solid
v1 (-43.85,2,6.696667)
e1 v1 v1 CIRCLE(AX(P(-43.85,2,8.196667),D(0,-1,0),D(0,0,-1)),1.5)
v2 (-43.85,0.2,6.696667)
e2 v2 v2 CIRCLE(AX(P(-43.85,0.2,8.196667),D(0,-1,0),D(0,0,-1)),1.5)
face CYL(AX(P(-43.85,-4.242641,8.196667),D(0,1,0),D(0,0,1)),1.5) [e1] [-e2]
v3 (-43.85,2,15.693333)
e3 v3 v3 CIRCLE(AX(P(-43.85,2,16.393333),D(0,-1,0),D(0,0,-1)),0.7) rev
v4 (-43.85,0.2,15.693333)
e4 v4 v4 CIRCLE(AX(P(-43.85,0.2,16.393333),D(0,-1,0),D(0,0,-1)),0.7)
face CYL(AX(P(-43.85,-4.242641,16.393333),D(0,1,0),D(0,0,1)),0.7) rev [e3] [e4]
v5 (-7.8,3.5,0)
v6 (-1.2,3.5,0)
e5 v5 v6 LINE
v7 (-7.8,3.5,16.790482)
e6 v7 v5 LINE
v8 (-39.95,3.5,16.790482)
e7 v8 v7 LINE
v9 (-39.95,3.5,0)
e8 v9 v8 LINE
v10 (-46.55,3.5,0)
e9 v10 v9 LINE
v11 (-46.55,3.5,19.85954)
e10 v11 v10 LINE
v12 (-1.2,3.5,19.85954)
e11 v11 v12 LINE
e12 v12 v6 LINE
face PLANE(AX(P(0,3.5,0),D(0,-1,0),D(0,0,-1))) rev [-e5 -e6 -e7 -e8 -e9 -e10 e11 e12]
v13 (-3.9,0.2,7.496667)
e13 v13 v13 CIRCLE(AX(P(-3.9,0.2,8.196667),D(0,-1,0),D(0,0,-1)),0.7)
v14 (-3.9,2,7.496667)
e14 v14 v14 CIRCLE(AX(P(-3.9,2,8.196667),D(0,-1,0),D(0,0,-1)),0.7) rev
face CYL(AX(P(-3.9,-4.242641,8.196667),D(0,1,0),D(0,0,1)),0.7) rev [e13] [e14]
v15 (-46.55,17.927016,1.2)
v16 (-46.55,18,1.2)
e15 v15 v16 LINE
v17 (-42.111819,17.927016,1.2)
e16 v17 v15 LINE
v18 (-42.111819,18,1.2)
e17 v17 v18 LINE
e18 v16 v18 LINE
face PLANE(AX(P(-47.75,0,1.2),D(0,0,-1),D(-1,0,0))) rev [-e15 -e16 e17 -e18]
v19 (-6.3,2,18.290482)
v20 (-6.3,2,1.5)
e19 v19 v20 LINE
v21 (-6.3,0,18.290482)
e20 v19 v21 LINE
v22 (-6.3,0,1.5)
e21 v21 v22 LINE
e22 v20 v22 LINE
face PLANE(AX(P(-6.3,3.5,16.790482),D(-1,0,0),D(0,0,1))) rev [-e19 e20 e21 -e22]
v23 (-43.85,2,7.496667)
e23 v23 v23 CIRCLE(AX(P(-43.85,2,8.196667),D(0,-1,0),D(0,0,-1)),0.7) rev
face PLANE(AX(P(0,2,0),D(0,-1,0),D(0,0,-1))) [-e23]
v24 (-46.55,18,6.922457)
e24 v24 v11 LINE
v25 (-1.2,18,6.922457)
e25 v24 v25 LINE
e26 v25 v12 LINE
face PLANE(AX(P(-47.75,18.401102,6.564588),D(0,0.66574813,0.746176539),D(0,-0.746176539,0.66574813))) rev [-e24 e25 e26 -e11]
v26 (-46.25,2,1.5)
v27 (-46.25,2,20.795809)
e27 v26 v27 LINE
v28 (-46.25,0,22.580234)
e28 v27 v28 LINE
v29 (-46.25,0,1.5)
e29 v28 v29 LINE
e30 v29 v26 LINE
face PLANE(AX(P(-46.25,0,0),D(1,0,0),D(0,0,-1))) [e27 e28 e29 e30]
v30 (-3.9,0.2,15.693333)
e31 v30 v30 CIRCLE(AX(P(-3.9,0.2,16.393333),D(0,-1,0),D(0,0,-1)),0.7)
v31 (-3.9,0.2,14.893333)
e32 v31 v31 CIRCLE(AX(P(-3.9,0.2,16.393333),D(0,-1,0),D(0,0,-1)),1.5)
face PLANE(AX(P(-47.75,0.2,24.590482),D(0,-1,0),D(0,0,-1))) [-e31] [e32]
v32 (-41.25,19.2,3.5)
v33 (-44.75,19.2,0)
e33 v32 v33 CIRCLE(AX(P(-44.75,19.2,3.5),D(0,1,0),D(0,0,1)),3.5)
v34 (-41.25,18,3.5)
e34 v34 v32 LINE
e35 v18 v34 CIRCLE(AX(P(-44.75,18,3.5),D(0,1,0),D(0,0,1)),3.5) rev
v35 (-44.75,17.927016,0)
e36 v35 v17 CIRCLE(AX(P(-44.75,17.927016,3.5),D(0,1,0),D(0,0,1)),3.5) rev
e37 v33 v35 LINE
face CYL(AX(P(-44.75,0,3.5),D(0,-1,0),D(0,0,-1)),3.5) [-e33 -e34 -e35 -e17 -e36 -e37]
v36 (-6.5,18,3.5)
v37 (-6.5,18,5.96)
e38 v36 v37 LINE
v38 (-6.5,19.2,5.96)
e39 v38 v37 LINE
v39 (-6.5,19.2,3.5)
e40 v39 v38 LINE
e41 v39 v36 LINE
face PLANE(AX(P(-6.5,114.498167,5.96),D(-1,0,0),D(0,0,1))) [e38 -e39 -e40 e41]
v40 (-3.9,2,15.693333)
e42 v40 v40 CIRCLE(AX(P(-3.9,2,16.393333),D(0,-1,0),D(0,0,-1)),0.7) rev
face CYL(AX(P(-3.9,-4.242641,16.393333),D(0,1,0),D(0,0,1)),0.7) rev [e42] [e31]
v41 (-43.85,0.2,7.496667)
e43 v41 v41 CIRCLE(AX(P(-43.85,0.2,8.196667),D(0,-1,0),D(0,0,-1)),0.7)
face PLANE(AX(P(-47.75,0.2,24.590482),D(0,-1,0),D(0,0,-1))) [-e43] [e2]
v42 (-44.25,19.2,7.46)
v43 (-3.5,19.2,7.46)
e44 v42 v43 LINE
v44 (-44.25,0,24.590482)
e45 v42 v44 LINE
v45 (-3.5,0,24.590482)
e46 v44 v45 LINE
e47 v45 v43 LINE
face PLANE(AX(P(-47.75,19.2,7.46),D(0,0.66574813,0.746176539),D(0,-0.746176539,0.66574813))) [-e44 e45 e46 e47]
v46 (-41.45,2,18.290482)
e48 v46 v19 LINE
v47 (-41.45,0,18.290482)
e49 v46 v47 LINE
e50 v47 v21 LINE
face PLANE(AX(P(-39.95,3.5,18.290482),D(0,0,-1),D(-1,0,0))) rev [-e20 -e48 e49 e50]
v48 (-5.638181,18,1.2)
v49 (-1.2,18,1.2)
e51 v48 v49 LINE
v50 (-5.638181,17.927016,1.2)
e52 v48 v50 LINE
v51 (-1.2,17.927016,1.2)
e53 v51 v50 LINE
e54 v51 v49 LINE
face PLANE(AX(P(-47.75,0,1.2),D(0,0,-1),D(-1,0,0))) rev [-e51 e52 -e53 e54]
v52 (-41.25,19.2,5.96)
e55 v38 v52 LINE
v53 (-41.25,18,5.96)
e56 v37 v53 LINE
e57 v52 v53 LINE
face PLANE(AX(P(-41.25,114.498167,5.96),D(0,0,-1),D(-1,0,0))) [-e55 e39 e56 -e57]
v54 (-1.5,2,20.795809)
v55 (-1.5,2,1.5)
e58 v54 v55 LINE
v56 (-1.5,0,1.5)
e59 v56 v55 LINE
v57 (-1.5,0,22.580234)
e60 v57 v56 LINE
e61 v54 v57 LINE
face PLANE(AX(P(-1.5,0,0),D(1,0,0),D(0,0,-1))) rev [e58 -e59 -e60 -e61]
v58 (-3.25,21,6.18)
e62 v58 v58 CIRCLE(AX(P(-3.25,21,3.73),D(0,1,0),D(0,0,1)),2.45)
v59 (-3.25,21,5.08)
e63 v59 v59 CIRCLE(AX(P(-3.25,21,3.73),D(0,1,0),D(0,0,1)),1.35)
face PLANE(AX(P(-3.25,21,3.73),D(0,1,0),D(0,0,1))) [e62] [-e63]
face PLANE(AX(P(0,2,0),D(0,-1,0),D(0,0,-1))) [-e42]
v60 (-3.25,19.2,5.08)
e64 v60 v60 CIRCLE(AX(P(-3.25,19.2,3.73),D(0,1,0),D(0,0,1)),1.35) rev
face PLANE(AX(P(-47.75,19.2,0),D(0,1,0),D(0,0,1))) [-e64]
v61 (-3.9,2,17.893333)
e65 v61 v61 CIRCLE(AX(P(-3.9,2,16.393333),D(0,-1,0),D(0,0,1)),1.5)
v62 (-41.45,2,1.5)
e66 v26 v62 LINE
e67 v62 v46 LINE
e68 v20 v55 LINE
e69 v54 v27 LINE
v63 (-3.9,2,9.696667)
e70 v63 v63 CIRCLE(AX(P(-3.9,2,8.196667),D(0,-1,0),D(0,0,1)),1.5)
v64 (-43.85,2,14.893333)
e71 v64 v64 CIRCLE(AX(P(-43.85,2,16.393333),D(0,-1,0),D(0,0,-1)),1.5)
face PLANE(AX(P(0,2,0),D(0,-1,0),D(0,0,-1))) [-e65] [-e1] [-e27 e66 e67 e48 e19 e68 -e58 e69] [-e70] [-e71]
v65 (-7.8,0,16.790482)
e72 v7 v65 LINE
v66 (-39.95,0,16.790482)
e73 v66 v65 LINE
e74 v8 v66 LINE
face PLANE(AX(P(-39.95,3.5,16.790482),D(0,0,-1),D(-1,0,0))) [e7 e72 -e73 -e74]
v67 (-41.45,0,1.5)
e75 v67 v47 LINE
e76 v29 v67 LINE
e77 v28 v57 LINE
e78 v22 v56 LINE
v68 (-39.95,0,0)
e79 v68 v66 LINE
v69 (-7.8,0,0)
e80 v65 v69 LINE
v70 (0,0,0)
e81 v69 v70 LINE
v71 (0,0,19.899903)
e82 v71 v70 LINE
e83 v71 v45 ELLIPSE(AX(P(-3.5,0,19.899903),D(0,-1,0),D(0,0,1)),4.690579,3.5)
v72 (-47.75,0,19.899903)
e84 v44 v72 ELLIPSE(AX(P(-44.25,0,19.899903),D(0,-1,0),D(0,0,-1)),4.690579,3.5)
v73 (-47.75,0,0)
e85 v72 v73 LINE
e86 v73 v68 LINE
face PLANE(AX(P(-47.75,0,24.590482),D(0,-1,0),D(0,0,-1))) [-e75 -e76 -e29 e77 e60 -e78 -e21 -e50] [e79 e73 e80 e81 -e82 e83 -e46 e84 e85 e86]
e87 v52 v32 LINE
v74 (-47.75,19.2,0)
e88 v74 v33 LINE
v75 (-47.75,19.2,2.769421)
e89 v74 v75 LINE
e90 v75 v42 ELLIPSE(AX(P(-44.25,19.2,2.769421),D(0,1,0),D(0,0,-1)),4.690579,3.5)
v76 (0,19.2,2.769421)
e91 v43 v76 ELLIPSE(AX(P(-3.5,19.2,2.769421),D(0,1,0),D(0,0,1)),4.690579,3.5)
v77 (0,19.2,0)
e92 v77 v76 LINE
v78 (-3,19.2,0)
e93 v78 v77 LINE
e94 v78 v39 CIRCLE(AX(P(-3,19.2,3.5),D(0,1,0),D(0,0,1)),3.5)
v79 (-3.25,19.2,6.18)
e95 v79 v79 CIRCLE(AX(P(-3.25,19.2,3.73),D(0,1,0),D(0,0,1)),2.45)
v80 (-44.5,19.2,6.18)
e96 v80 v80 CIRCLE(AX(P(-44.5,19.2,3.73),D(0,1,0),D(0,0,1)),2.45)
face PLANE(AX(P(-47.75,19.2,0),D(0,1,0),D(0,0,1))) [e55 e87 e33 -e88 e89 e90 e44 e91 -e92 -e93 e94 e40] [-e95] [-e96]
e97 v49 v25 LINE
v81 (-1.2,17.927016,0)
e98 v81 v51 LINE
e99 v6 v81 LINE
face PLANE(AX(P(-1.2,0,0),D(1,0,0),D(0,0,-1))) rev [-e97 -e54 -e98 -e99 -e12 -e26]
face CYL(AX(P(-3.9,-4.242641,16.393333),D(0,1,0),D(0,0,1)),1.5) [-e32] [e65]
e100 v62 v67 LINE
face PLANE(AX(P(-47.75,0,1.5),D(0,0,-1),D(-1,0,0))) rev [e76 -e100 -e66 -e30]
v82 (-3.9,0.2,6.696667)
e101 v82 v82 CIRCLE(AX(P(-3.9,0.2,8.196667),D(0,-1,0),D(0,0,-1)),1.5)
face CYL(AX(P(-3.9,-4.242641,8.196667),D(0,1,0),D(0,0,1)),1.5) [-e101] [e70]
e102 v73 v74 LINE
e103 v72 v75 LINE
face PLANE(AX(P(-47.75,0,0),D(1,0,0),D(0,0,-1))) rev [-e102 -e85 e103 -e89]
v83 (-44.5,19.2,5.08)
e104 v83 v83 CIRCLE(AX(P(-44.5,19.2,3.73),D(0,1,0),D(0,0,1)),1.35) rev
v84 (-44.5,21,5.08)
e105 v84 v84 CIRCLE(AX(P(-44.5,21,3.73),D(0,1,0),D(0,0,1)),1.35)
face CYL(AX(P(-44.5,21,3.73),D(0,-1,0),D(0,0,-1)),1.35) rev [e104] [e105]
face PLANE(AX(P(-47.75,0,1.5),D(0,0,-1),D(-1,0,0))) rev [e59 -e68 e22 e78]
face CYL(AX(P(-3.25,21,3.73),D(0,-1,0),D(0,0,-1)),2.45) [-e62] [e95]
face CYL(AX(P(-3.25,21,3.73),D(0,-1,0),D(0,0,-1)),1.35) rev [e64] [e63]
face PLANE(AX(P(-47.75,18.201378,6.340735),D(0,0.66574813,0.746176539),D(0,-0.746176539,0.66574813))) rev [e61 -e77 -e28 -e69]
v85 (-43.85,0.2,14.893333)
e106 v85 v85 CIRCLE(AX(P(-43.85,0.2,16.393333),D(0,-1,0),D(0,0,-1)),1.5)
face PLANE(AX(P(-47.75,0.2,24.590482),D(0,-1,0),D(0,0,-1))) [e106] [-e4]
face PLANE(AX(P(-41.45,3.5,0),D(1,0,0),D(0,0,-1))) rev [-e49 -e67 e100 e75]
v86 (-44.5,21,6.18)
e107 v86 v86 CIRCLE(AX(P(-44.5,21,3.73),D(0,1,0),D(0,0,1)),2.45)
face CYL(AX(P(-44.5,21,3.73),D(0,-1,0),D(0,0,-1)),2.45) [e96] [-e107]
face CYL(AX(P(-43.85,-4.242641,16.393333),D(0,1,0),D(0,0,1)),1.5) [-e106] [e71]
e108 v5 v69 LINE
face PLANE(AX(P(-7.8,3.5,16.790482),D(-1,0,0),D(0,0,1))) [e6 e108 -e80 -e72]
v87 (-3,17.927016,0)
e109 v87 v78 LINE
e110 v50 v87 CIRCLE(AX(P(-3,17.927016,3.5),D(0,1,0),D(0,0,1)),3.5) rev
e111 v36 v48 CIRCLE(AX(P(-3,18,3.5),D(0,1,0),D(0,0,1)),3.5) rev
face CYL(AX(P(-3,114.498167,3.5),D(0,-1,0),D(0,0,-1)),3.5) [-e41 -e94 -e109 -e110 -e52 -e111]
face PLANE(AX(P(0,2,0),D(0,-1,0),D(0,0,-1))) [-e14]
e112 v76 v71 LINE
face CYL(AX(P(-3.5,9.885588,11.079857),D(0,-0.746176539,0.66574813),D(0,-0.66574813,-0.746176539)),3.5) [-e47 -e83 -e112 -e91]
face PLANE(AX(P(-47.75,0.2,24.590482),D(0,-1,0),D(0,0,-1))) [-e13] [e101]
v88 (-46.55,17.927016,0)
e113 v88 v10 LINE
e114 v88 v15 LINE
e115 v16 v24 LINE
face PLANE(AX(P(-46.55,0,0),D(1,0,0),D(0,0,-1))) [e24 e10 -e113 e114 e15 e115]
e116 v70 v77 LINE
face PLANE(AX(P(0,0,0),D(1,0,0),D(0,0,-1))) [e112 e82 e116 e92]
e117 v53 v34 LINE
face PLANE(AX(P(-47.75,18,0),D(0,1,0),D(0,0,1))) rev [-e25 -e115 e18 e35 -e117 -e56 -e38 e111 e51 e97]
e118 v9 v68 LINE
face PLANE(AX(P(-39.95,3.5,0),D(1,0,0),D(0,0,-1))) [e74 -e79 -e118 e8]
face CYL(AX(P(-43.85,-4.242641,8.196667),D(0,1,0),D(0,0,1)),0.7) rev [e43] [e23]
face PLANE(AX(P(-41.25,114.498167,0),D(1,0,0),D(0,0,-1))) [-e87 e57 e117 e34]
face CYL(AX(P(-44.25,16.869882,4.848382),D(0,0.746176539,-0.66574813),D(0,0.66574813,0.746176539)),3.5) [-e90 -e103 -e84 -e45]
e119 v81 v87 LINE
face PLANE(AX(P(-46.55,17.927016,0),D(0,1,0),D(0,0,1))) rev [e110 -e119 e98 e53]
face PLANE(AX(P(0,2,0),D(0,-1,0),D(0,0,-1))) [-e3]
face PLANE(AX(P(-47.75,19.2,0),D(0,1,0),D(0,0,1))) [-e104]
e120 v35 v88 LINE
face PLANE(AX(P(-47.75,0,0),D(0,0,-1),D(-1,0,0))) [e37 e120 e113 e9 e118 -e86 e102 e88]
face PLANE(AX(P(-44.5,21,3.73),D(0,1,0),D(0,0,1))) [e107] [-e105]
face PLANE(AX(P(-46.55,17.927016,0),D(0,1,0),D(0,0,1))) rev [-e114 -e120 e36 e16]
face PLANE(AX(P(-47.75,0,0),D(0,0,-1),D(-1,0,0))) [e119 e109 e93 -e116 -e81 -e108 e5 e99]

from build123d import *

# Parameters (mm, degrees)
BOSS_EXTRUDE1_DEPTH     = 47.75
SHELL2_T                = -1.2
SKETCH2_W               = 45.35
SKETCH2_H               = 17.927015757
CUT_EXTRUDE1_DEPTH      = 57.531559043
CUT_EXTRUDE2_DEPTH      = 58.038533691
CUT_EXTRUDE2_DEPTH_BACK = 58.038533691
BOSS_EXTRUDE2_DEPTH     = 3.5
CUT_EXTRUDE3_DEPTH      = 58.038533691
SKETCH7_R               = 2.45
SKETCH7_R_2             = 1.35
BOSS_EXTRUDE3_DEPTH     = 1.8
SHELL3_START            = -46.25
SHELL3_DEPTH            = 44.75
SHELL3_2_OUTLINE_W      = 2
SHELL3_2_OUTLINE_H      = 16.790482419
SHELL3_2_DEPTH          = 4.8
SHELL3_START_2          = -6.3
SHELL3_3_OUTLINE_W      = 2
SHELL3_3_OUTLINE_H      = 16.790482419
SHELL3_3_DEPTH          = 4.8
SKETCH8_R               = 1.5
SKETCH8_R_2             = 0.7
BOSS_EXTRUDE4_DEPTH     = 1.8
FILLET1_R               = 3.5


# Read off the part's stored shape, not the designer's step: Shell3
with BuildPart() as part:
    # Sketch1 → Boss-Extrude1 (new body)
    with BuildSketch(Plane(origin=(0, 0, 0), x_dir=(0, 0, -1), z_dir=(1, 0, 0))):
        Polygon((0, 0), (0, 19.2), (-7.46, 19.2), (-24.590482419, 0), align=None)
    extrude(amount=-BOSS_EXTRUDE1_DEPTH)

    # Shell2
    shell2_openings = [part.faces().sort_by_distance(p)[0] for p in [
        (-23.875, 0, 12.29524121),
    ]]
    offset(amount=SHELL2_T, openings=shell2_openings, kind=Kind.INTERSECTION)

    # Sketch2 → Cut-Extrude1 (cut, through all)
    with BuildSketch(Plane.XY.offset(1.2)):
        with Locations((-23.875, 8.963507878)):
            Rectangle(SKETCH2_W, SKETCH2_H)
    extrude(amount=-CUT_EXTRUDE1_DEPTH, mode=Mode.SUBTRACT)

    # Sketch3 → Cut-Extrude2 (cut, two sides: drawn at the far end of the back side and taken through both)
    with BuildSketch(Plane(origin=(0, 19.2, 0), x_dir=(1, 0, 0), z_dir=(0, 1, 0)).offset(-CUT_EXTRUDE2_DEPTH_BACK)):
        Polygon((-41.25, 106.046953634), (-41.25, 0), (-41.25, -5.96), (-6.5, -5.96), (-6.5, 0), (-6.5, 106.046953634), (-6.5, 318.140860903), (-41.25, 318.140860903), align=None)
    extrude(amount=CUT_EXTRUDE2_DEPTH + CUT_EXTRUDE2_DEPTH_BACK, mode=Mode.SUBTRACT)

    # Sketch5 → Boss-Extrude2 (add)
    with BuildSketch(Plane.XZ):
        Polygon((-47.75, 0), (-39.95, 0), (-39.95, 16.790482419), (-7.8, 16.790482419), (-7.8, 0), (0, 0), (0, 24.590482419), (-47.75, 24.590482419), align=None)
    extrude(amount=-BOSS_EXTRUDE2_DEPTH)

    # Sketch6 → Cut-Extrude3 (cut, through all)
    with BuildSketch(Plane.ZY.offset(47.75)):
        Polygon((21.467738228, 3.5), (24.590482419, 0), (24.590482419, 3.5), align=None)
    extrude(amount=-CUT_EXTRUDE3_DEPTH, mode=Mode.SUBTRACT)

    # Sketch7 → Boss-Extrude3 (add)
    # profile 1 of 2: a face of its own
    with BuildSketch(Plane(origin=(0, 19.2, 0), x_dir=(1, 0, 0), z_dir=(0, 1, 0))):
        with Locations(Location((-44.5, -3.73, 0), (0, 0, 270))):
            Circle(SKETCH7_R)
        with Locations(Location((-44.5, -3.73, 0), (0, 0, 270))):
            Circle(SKETCH7_R_2, mode=Mode.SUBTRACT)
    # profile 2 of 2: a face of its own
    with BuildSketch(Plane(origin=(0, 19.2, 0), x_dir=(1, 0, 0), z_dir=(0, 1, 0))):
        with Locations(Location((-3.25, -3.73, 0), (0, 0, 270))):
            Circle(SKETCH7_R)
        with Locations(Location((-3.25, -3.73, 0), (0, 0, 270))):
            Circle(SKETCH7_R_2, mode=Mode.SUBTRACT)
    extrude(amount=BOSS_EXTRUDE3_DEPTH)

    # Shell3 outline → Shell3 (cut)
    with BuildSketch(Plane.YZ.offset(SHELL3_START)):
        Polygon((2, 18.290482419), (2, 20.795809028), (0, 22.58023428), (0, 18.290482419), align=None)
    extrude(amount=SHELL3_DEPTH, mode=Mode.SUBTRACT)

    # Shell3 2 outline → Shell3 2 (cut)
    with BuildSketch(Plane.YZ.offset(SHELL3_START)):
        with Locations((1, 9.895241209)):
            Rectangle(SHELL3_2_OUTLINE_W, SHELL3_2_OUTLINE_H)
    extrude(amount=SHELL3_2_DEPTH, mode=Mode.SUBTRACT)

    # Shell3 3 outline → Shell3 3 (cut)
    with BuildSketch(Plane.YZ.offset(SHELL3_START_2)):
        with Locations((1, 9.895241209)):
            Rectangle(SHELL3_3_OUTLINE_W, SHELL3_3_OUTLINE_H)
    extrude(amount=SHELL3_3_DEPTH, mode=Mode.SUBTRACT)

    # Sketch8 → Boss-Extrude4 (add)
    # profile 1 of 4: a face of its own
    with BuildSketch(Plane.XZ.offset(-2)):
        with Locations(Location((-43.85, 8.196666667, 0), (0, 0, 270))):
            Circle(SKETCH8_R)
        with Locations(Location((-43.85, 8.196666667, 0), (0, 0, 270))):
            Circle(SKETCH8_R_2, mode=Mode.SUBTRACT)
    # profile 2 of 4: a face of its own
    with BuildSketch(Plane.XZ.offset(-2)):
        with Locations(Location((-43.85, 16.393333333, 0), (0, 0, 270))):
            Circle(SKETCH8_R)
        with Locations(Location((-43.85, 16.393333333, 0), (0, 0, 270))):
            Circle(SKETCH8_R_2, mode=Mode.SUBTRACT)
    # profile 3 of 4: a face of its own
    with BuildSketch(Plane.XZ.offset(-2)):
        with Locations(Location((-3.9, 16.393333333, 0), (0, 0, 90))):
            Circle(SKETCH8_R)
        with Locations(Location((-3.9, 16.393333333, 0), (0, 0, 270))):
            Circle(SKETCH8_R_2, mode=Mode.SUBTRACT)
    # profile 4 of 4: a face of its own
    with BuildSketch(Plane.XZ.offset(-2)):
        with Locations(Location((-3.9, 8.196666667, 0), (0, 0, 90))):
            Circle(SKETCH8_R)
        with Locations(Location((-3.9, 8.196666667, 0), (0, 0, 270))):
            Circle(SKETCH8_R_2, mode=Mode.SUBTRACT)
    extrude(amount=BOSS_EXTRUDE4_DEPTH)

    # Fillet1
    fillet1_edges = [part.edges().sort_by_distance(p)[0] for p in [
        (-47.75, 9.6, 16.02524121),
        (0, 9.6, 16.02524121),
        (-41.25, 18.563507879, 0),
        (-6.5, 18.563507879, 0),
    ]]
    fillet(fillet1_edges, radius=FILLET1_R)


solid = part.part
